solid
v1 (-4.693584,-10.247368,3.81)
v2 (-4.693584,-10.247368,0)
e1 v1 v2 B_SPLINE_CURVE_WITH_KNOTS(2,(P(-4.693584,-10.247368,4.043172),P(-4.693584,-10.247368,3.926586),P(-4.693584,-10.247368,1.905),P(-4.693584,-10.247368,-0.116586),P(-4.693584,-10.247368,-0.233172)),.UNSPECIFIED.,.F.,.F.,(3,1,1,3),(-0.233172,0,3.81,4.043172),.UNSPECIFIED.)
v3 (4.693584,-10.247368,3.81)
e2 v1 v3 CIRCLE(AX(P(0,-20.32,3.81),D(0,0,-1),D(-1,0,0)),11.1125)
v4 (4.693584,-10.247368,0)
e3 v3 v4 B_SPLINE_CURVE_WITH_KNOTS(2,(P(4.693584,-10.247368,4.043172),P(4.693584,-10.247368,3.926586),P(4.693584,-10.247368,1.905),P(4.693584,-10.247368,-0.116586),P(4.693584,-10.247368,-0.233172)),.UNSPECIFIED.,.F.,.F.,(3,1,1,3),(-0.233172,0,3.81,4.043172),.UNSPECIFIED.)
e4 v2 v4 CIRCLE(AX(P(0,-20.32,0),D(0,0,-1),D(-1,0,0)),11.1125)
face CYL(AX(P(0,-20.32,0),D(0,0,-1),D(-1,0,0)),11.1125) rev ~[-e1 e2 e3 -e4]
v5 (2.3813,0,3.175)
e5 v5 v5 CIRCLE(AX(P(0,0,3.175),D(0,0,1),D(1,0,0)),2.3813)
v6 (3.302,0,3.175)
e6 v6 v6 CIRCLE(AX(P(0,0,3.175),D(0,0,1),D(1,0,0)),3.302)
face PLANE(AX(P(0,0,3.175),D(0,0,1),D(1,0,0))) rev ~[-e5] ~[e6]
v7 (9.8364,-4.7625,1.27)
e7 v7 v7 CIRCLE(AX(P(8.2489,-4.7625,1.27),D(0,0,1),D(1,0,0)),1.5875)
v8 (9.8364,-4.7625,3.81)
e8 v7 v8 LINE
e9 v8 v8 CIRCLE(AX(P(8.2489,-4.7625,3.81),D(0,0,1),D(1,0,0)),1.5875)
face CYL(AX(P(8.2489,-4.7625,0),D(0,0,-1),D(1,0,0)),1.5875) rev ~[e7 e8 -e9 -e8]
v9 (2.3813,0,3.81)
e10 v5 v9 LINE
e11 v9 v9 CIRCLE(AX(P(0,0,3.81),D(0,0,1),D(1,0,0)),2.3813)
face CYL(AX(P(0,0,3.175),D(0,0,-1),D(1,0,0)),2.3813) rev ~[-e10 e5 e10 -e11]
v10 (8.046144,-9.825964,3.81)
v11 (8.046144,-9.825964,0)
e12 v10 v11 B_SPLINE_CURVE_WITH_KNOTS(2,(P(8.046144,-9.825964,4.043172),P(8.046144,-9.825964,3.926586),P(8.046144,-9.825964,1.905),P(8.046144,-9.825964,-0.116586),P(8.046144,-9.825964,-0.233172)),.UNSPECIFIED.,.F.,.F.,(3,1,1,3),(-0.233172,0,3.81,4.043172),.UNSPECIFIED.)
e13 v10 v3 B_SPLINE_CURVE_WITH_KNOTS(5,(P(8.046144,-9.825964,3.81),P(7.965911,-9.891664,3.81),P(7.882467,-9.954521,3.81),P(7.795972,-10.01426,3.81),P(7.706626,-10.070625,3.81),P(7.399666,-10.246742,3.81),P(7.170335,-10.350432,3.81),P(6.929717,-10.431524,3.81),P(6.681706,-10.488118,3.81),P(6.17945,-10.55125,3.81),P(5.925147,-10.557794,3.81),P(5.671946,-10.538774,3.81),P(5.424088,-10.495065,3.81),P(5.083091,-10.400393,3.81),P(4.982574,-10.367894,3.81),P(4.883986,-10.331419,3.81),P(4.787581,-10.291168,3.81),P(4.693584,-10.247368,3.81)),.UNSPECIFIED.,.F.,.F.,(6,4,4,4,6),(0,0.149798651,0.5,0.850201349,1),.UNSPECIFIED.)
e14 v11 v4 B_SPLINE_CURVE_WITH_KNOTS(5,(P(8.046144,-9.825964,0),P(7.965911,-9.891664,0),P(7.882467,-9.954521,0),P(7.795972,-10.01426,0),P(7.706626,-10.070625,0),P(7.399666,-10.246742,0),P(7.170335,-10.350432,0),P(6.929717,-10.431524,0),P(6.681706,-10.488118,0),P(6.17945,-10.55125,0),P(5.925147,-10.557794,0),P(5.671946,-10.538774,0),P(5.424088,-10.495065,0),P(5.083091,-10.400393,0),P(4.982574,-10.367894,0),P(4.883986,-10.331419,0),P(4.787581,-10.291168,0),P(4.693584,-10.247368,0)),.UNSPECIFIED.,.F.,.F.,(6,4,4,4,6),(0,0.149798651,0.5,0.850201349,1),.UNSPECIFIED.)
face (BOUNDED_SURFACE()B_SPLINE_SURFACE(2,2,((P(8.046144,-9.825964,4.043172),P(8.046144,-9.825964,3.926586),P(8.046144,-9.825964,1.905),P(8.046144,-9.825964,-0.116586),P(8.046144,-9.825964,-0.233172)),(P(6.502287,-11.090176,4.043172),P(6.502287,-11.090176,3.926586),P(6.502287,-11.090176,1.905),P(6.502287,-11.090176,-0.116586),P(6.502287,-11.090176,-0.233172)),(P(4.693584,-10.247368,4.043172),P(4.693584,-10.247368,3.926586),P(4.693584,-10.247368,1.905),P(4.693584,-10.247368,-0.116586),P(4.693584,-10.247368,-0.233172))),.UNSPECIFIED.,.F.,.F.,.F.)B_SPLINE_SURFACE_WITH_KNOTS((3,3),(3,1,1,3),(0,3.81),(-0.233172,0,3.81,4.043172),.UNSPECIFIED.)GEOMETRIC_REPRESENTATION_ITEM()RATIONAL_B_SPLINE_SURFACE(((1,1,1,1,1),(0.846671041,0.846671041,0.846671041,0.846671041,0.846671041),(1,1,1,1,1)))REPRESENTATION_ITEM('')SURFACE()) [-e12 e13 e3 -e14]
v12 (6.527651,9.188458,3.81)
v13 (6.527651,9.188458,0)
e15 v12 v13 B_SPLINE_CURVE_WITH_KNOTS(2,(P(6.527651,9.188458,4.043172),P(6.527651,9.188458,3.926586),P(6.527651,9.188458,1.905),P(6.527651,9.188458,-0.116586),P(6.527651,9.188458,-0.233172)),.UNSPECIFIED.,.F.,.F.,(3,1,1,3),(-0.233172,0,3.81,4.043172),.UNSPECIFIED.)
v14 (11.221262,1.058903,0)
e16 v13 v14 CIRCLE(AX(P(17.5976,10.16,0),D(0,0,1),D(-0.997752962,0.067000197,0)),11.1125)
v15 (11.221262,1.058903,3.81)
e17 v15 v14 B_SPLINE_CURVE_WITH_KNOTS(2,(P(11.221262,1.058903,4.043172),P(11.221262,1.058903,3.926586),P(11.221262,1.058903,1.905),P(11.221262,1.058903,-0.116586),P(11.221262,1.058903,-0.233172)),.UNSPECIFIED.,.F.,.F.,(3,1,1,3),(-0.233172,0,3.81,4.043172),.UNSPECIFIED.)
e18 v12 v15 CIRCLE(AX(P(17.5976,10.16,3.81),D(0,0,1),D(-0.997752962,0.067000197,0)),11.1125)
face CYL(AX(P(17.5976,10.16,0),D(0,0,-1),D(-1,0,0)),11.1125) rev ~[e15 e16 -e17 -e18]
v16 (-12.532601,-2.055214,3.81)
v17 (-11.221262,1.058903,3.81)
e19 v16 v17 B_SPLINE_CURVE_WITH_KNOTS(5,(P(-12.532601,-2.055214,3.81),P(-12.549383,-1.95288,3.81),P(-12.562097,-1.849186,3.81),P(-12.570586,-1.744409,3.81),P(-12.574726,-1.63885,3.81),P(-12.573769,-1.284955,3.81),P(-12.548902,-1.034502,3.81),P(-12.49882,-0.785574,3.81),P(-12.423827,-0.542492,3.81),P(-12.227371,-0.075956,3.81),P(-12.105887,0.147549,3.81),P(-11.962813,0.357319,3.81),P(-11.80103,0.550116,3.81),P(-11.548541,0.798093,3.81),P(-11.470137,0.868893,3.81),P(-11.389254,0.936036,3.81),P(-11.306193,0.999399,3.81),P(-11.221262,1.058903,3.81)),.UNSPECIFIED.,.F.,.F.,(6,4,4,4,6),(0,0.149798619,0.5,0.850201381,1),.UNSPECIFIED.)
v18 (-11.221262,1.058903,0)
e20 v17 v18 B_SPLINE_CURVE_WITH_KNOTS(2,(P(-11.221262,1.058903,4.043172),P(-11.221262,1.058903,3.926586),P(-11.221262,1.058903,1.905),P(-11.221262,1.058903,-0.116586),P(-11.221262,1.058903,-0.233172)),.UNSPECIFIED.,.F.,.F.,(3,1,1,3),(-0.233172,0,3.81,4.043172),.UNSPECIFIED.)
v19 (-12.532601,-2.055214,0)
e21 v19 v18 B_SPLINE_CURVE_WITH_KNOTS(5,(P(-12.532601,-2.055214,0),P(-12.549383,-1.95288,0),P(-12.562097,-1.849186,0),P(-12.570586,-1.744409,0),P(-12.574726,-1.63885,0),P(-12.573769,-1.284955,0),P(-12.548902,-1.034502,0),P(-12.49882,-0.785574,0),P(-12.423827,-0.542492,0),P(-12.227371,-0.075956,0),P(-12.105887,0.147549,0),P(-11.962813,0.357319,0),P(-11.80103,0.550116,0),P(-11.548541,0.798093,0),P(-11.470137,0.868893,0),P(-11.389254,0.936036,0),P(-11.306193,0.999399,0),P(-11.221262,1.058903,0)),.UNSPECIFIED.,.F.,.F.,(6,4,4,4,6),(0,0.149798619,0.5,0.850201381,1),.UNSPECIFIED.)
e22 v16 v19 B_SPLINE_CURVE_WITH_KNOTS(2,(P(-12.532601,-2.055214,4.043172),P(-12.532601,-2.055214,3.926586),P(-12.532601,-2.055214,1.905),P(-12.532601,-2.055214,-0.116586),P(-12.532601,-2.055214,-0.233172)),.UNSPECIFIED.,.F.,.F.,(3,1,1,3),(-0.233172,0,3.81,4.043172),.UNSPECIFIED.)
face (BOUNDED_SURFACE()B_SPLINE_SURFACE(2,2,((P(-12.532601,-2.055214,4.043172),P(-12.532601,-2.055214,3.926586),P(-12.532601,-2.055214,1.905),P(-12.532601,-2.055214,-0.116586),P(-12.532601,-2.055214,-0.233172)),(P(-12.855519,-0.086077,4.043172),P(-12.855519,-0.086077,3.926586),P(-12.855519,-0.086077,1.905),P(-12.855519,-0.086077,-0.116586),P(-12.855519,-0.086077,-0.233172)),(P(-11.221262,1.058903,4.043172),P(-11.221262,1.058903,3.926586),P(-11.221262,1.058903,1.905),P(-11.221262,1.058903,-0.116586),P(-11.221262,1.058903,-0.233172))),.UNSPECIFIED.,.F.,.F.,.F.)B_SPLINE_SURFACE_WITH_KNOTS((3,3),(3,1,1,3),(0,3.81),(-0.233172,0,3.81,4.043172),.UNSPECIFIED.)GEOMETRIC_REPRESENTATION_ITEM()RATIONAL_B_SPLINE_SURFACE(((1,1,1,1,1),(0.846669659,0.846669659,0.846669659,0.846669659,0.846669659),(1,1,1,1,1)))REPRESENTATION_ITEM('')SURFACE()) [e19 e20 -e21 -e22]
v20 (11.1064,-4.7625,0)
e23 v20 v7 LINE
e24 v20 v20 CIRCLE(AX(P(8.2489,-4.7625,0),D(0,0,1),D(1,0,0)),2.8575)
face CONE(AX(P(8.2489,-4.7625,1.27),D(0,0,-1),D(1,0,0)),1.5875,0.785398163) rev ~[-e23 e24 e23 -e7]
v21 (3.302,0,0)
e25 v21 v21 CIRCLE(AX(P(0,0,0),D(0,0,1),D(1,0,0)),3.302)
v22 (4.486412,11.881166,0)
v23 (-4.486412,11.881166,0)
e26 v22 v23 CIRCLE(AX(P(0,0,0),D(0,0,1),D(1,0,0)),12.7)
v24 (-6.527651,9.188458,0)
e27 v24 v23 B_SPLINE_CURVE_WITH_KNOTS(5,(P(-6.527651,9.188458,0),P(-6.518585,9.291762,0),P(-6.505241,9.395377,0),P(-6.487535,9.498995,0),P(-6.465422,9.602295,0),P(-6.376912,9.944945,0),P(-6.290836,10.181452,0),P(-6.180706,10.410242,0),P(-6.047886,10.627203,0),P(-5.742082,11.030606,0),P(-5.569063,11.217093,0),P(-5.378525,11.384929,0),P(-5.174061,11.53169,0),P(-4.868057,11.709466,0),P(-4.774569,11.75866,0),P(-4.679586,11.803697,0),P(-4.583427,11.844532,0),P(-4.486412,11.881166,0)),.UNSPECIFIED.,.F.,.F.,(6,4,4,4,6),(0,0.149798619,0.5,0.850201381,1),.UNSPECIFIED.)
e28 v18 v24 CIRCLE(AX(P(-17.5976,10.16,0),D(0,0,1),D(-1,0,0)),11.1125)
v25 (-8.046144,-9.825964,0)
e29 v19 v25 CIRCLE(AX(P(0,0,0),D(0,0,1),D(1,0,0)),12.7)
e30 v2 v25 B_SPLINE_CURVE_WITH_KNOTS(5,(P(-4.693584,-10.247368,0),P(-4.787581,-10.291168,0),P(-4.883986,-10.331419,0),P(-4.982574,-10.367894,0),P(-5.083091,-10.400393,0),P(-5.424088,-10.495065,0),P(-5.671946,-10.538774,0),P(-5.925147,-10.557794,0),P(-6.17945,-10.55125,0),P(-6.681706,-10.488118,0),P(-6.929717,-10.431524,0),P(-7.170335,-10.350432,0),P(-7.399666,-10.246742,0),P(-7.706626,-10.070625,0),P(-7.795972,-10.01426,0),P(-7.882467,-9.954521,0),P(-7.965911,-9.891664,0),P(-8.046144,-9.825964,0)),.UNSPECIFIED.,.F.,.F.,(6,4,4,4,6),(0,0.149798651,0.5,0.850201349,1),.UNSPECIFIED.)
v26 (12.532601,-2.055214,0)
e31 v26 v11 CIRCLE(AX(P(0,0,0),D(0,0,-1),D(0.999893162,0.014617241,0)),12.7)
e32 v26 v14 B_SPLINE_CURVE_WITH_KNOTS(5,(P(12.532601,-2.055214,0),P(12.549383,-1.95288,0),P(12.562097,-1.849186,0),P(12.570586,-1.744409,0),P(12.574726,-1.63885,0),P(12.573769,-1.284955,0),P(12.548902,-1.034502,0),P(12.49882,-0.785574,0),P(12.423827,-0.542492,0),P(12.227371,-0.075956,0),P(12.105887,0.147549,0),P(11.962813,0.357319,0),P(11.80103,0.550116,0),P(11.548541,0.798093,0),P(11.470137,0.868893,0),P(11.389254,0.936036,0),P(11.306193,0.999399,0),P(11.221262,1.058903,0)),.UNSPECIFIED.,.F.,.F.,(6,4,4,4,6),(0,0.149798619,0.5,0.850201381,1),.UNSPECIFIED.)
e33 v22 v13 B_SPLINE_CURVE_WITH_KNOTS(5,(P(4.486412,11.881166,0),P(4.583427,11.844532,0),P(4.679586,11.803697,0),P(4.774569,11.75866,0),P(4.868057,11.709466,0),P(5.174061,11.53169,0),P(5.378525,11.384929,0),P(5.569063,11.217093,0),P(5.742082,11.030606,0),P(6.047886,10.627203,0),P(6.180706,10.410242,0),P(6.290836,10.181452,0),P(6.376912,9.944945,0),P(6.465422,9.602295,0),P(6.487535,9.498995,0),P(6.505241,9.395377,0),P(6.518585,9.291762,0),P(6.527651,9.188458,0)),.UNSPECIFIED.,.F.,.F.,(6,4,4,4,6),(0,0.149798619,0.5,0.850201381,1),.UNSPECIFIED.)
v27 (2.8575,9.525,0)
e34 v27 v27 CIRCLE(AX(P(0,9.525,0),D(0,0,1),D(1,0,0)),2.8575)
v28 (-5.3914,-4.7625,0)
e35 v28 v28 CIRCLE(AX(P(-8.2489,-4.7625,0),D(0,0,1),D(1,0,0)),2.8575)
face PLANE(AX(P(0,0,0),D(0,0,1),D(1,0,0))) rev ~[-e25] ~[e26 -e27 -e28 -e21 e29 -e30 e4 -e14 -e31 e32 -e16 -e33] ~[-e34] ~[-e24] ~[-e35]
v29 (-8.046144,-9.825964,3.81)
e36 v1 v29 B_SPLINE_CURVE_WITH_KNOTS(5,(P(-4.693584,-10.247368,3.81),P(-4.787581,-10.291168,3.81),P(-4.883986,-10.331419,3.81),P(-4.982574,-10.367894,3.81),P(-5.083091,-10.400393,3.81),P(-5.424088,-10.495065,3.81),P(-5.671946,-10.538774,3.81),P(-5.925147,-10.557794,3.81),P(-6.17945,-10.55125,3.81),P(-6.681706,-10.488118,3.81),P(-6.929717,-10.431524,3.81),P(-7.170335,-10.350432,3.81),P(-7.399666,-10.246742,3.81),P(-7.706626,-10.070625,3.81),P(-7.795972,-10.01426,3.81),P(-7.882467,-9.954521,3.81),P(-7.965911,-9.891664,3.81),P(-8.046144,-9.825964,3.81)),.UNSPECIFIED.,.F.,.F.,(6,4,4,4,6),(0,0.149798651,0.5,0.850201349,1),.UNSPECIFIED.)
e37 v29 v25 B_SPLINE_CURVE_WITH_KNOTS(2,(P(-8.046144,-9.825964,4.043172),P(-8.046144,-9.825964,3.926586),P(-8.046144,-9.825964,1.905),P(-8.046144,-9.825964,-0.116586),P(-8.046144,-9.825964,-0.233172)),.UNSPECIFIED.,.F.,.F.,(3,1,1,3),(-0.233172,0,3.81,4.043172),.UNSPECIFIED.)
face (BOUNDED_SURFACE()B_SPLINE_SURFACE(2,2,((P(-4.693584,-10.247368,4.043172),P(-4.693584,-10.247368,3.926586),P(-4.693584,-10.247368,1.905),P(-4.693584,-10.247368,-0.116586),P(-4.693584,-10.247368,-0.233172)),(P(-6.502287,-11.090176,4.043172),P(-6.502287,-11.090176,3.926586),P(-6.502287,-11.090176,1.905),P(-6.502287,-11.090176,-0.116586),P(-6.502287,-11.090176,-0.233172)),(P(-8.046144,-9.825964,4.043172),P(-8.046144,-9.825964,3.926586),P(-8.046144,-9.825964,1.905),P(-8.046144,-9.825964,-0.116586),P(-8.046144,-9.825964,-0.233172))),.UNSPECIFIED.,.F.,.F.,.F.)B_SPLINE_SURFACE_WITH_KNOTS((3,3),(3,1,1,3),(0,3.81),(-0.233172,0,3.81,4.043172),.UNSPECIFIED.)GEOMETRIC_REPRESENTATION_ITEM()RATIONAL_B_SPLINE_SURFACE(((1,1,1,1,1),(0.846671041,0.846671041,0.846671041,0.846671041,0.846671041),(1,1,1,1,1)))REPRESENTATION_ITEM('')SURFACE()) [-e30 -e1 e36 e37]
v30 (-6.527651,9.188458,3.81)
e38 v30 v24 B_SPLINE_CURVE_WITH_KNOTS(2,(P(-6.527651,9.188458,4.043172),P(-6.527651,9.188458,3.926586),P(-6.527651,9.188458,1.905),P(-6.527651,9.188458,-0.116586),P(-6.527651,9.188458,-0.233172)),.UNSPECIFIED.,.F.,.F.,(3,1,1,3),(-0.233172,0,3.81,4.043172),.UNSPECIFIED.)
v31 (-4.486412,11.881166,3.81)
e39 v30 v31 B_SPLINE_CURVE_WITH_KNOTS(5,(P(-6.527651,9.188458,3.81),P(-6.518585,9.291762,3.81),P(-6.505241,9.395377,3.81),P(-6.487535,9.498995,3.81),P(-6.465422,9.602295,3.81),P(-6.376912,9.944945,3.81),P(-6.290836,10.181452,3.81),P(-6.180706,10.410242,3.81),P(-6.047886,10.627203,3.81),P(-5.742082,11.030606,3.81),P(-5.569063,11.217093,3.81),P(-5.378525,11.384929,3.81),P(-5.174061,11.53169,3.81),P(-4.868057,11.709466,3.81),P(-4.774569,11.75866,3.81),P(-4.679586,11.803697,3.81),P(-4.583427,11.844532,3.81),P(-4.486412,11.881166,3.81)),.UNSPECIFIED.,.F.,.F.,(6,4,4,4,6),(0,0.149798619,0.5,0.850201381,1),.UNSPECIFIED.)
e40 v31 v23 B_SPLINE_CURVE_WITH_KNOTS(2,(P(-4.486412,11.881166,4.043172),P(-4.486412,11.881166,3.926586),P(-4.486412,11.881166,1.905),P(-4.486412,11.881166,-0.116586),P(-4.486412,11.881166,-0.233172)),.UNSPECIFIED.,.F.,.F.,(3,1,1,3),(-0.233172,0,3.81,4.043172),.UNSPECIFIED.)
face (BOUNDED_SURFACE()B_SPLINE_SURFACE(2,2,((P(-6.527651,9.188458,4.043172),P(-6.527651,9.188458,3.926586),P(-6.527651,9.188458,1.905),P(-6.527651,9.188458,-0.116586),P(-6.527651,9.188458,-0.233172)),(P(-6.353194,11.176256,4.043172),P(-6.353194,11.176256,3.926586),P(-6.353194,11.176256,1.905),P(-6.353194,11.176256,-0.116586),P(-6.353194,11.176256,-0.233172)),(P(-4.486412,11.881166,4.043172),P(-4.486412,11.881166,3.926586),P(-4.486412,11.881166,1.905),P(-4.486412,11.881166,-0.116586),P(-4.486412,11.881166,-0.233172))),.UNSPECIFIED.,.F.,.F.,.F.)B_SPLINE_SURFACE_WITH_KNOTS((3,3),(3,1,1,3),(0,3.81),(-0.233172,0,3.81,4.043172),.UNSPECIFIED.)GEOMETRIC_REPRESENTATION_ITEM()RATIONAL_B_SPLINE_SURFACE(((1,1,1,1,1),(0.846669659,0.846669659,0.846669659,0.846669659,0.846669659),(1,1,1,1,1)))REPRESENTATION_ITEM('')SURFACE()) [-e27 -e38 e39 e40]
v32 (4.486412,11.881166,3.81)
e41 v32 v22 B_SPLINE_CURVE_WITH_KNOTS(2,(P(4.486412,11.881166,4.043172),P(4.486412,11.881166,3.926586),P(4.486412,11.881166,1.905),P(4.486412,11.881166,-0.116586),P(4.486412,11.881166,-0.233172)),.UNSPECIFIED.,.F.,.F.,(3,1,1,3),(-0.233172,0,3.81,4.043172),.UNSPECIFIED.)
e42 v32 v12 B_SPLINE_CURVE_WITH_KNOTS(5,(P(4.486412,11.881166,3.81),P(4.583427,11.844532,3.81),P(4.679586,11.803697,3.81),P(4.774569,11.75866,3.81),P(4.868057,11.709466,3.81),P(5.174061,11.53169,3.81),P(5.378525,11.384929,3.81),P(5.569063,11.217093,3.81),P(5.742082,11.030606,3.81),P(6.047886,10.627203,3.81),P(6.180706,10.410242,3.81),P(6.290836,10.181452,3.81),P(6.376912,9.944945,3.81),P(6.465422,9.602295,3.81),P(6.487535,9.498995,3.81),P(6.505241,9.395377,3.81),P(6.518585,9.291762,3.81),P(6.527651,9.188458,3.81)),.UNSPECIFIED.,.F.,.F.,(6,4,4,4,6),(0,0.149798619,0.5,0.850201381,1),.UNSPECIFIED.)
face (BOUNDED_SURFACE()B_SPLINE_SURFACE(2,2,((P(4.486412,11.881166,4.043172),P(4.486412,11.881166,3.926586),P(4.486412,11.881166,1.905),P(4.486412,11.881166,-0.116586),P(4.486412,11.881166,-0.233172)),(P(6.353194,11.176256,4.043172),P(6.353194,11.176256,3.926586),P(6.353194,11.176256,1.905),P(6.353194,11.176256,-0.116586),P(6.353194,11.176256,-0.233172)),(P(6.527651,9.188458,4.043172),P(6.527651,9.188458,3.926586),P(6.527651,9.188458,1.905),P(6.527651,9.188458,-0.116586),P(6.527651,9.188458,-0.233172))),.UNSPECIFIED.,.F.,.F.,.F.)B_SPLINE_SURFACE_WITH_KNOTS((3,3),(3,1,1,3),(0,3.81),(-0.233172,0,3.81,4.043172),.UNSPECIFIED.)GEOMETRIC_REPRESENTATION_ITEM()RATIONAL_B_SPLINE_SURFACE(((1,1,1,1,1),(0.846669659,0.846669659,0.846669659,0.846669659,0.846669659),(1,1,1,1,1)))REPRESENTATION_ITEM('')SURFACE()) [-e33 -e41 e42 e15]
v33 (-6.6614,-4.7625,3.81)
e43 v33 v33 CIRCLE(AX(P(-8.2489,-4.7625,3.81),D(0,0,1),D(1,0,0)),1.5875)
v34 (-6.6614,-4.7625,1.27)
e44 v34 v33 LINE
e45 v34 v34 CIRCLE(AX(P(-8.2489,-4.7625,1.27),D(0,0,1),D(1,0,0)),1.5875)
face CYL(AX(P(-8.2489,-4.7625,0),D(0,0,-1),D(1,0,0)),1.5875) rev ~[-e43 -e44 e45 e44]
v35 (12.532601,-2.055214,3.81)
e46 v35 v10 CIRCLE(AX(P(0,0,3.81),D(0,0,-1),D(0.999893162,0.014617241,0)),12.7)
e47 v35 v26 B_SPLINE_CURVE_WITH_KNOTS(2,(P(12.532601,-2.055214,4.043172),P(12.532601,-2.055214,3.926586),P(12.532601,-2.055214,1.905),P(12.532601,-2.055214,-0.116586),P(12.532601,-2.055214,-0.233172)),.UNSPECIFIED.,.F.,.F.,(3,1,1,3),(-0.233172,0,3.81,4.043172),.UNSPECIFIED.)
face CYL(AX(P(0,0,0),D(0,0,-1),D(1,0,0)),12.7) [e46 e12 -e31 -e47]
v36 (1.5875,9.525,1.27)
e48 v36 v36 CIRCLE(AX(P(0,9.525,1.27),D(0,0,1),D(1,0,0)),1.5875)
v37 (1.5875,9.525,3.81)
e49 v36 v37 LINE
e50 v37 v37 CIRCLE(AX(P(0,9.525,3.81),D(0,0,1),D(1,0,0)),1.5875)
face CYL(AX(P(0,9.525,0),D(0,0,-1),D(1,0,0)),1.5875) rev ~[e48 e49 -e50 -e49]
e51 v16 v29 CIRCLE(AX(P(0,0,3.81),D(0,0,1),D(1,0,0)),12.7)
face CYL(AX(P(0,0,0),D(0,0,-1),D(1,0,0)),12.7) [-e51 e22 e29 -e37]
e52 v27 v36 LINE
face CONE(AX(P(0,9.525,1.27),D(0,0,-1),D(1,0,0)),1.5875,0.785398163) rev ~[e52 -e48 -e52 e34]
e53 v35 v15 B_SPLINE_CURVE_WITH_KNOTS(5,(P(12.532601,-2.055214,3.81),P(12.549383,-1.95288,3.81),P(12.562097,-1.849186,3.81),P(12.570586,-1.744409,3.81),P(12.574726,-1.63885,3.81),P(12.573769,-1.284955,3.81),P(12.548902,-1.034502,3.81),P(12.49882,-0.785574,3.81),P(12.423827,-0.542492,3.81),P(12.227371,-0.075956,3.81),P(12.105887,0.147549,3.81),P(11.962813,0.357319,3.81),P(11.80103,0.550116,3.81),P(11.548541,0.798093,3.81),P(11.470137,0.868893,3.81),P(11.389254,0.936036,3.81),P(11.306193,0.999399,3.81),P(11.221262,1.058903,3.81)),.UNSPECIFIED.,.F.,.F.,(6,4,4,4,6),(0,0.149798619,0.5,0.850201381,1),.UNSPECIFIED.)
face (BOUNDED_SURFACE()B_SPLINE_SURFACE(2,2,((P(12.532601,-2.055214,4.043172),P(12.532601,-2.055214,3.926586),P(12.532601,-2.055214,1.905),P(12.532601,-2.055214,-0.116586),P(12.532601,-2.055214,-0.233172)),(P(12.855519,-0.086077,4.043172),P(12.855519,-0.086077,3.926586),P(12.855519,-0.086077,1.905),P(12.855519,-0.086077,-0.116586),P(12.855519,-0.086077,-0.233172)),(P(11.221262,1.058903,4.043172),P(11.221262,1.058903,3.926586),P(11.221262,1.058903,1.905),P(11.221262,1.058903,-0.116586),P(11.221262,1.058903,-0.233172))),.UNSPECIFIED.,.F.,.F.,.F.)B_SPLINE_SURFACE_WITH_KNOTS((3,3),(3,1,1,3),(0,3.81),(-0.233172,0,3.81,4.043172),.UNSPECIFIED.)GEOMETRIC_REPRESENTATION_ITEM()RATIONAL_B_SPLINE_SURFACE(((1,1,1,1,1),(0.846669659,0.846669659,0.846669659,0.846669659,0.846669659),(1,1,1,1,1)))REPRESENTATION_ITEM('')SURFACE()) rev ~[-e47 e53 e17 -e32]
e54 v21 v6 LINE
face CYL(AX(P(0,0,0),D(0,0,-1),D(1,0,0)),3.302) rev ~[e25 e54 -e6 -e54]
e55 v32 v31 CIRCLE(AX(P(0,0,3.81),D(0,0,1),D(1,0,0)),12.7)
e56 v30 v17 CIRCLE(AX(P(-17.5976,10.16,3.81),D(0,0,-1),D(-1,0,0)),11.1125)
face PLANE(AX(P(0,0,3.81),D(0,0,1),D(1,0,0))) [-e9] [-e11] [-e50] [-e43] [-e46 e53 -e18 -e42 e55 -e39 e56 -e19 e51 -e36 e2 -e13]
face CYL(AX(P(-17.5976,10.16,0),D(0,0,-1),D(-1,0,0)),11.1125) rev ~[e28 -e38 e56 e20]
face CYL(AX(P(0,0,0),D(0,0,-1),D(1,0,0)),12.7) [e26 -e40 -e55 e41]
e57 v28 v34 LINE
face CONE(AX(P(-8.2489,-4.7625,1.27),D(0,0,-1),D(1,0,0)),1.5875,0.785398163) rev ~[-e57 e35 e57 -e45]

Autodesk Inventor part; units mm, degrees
ref_plane "YZ Plane" through (0, 0, 0) normal (1, 0, 0) x (0, 1, 0)
ref_plane "XZ Plane" through (0, 0, 0) normal (0, 1, 0) x (-1, 0, 0)
ref_plane "XY Plane" through (0, 0, 0) normal (0, 0, 1) x (1, 0, 0)
sketch "Sketch1" plane through (0, 0, 0) normal (0, 0, 1) x (1, 0, 0)
  circle A0 centre (0, 0) radius 3.302
  line L0 (0, 0) -> (0, 9.525)
  circle A1 centre (0, 9.525) radius 1.5875
  circle A2 centre (-8.2489, -4.7625) radius 1.5875
  circle A3 centre (8.2489, -4.7625) radius 1.5875
  circle A4 centre (0, 0) radius 12.7
  dimension "d0" = 6.604
  dimension "d1" = 9.525
  dimension "d2" = 3.175
  dimension "d5" = 360
  dimension "d7" = 25.4
extrude "Extrusion1" add sketch "Sketch1" along normal blind 3.175
sketch "Sketch2" plane through (0, 0, 3.175) normal (0, 0, 1) x (1, 0, 0)
  circle A0 centre (0, 0) radius 3.302 projected
  circle A1 centre (8.2489, -4.7625) radius 1.5875 projected
  circle A2 centre (-8.2489, -4.7625) radius 1.5875 projected
  circle A3 centre (0, 9.525) radius 1.5875 projected
  circle A4 centre (0, 0) radius 12.7 projected
  circle A5 centre (0, 0) radius 2.3813
  dimension "d10" = 4.7625
extrude "Extrusion2" add sketch "Sketch2" along normal blind 0.635 contours A0 | A4
chamfer "Chamfer1" distance 1.27 angle 45 3 edges at (-1.5875, 9.525, 0) (-9.8364, -4.7625, 0) (6.6614, -4.7625, 0)
sketch "Sketch3" plane through (0, 0, 0) normal (0, 0, -1) x (-1, 0, 0)
  line L0 (0, 0) -> (17.5976, 10.16)
  line L1 (0, 0) -> (20.32, 0) construction
  circle A0 centre (17.5976, 10.16) radius 11.1125
  circle A1 centre (-17.5976, 10.16) radius 11.1125
  circle A2 centre (0, -20.32) radius 11.1125
  dimension "d16" = 20.32
  dimension "d17" = 30
  dimension "d18" = 22.225
  dimension "d21" = 360
extrude "Extrusion3" cut sketch "Sketch3" against normal blind 25.4
fillet "Fillet1" radius 3.175 6 edges at (-12.6986, 0.1857, 1.905) (-6.5101, 10.9045, 1.905) (12.6986, 0.1857, 1.905) (6.5101, 10.9045, 1.905) (6.1885, -11.0902, 1.905) (-6.1885, -11.0902, 1.905)
properties part number "spoolPinionBearingHolder" material "ABS Plastic"
